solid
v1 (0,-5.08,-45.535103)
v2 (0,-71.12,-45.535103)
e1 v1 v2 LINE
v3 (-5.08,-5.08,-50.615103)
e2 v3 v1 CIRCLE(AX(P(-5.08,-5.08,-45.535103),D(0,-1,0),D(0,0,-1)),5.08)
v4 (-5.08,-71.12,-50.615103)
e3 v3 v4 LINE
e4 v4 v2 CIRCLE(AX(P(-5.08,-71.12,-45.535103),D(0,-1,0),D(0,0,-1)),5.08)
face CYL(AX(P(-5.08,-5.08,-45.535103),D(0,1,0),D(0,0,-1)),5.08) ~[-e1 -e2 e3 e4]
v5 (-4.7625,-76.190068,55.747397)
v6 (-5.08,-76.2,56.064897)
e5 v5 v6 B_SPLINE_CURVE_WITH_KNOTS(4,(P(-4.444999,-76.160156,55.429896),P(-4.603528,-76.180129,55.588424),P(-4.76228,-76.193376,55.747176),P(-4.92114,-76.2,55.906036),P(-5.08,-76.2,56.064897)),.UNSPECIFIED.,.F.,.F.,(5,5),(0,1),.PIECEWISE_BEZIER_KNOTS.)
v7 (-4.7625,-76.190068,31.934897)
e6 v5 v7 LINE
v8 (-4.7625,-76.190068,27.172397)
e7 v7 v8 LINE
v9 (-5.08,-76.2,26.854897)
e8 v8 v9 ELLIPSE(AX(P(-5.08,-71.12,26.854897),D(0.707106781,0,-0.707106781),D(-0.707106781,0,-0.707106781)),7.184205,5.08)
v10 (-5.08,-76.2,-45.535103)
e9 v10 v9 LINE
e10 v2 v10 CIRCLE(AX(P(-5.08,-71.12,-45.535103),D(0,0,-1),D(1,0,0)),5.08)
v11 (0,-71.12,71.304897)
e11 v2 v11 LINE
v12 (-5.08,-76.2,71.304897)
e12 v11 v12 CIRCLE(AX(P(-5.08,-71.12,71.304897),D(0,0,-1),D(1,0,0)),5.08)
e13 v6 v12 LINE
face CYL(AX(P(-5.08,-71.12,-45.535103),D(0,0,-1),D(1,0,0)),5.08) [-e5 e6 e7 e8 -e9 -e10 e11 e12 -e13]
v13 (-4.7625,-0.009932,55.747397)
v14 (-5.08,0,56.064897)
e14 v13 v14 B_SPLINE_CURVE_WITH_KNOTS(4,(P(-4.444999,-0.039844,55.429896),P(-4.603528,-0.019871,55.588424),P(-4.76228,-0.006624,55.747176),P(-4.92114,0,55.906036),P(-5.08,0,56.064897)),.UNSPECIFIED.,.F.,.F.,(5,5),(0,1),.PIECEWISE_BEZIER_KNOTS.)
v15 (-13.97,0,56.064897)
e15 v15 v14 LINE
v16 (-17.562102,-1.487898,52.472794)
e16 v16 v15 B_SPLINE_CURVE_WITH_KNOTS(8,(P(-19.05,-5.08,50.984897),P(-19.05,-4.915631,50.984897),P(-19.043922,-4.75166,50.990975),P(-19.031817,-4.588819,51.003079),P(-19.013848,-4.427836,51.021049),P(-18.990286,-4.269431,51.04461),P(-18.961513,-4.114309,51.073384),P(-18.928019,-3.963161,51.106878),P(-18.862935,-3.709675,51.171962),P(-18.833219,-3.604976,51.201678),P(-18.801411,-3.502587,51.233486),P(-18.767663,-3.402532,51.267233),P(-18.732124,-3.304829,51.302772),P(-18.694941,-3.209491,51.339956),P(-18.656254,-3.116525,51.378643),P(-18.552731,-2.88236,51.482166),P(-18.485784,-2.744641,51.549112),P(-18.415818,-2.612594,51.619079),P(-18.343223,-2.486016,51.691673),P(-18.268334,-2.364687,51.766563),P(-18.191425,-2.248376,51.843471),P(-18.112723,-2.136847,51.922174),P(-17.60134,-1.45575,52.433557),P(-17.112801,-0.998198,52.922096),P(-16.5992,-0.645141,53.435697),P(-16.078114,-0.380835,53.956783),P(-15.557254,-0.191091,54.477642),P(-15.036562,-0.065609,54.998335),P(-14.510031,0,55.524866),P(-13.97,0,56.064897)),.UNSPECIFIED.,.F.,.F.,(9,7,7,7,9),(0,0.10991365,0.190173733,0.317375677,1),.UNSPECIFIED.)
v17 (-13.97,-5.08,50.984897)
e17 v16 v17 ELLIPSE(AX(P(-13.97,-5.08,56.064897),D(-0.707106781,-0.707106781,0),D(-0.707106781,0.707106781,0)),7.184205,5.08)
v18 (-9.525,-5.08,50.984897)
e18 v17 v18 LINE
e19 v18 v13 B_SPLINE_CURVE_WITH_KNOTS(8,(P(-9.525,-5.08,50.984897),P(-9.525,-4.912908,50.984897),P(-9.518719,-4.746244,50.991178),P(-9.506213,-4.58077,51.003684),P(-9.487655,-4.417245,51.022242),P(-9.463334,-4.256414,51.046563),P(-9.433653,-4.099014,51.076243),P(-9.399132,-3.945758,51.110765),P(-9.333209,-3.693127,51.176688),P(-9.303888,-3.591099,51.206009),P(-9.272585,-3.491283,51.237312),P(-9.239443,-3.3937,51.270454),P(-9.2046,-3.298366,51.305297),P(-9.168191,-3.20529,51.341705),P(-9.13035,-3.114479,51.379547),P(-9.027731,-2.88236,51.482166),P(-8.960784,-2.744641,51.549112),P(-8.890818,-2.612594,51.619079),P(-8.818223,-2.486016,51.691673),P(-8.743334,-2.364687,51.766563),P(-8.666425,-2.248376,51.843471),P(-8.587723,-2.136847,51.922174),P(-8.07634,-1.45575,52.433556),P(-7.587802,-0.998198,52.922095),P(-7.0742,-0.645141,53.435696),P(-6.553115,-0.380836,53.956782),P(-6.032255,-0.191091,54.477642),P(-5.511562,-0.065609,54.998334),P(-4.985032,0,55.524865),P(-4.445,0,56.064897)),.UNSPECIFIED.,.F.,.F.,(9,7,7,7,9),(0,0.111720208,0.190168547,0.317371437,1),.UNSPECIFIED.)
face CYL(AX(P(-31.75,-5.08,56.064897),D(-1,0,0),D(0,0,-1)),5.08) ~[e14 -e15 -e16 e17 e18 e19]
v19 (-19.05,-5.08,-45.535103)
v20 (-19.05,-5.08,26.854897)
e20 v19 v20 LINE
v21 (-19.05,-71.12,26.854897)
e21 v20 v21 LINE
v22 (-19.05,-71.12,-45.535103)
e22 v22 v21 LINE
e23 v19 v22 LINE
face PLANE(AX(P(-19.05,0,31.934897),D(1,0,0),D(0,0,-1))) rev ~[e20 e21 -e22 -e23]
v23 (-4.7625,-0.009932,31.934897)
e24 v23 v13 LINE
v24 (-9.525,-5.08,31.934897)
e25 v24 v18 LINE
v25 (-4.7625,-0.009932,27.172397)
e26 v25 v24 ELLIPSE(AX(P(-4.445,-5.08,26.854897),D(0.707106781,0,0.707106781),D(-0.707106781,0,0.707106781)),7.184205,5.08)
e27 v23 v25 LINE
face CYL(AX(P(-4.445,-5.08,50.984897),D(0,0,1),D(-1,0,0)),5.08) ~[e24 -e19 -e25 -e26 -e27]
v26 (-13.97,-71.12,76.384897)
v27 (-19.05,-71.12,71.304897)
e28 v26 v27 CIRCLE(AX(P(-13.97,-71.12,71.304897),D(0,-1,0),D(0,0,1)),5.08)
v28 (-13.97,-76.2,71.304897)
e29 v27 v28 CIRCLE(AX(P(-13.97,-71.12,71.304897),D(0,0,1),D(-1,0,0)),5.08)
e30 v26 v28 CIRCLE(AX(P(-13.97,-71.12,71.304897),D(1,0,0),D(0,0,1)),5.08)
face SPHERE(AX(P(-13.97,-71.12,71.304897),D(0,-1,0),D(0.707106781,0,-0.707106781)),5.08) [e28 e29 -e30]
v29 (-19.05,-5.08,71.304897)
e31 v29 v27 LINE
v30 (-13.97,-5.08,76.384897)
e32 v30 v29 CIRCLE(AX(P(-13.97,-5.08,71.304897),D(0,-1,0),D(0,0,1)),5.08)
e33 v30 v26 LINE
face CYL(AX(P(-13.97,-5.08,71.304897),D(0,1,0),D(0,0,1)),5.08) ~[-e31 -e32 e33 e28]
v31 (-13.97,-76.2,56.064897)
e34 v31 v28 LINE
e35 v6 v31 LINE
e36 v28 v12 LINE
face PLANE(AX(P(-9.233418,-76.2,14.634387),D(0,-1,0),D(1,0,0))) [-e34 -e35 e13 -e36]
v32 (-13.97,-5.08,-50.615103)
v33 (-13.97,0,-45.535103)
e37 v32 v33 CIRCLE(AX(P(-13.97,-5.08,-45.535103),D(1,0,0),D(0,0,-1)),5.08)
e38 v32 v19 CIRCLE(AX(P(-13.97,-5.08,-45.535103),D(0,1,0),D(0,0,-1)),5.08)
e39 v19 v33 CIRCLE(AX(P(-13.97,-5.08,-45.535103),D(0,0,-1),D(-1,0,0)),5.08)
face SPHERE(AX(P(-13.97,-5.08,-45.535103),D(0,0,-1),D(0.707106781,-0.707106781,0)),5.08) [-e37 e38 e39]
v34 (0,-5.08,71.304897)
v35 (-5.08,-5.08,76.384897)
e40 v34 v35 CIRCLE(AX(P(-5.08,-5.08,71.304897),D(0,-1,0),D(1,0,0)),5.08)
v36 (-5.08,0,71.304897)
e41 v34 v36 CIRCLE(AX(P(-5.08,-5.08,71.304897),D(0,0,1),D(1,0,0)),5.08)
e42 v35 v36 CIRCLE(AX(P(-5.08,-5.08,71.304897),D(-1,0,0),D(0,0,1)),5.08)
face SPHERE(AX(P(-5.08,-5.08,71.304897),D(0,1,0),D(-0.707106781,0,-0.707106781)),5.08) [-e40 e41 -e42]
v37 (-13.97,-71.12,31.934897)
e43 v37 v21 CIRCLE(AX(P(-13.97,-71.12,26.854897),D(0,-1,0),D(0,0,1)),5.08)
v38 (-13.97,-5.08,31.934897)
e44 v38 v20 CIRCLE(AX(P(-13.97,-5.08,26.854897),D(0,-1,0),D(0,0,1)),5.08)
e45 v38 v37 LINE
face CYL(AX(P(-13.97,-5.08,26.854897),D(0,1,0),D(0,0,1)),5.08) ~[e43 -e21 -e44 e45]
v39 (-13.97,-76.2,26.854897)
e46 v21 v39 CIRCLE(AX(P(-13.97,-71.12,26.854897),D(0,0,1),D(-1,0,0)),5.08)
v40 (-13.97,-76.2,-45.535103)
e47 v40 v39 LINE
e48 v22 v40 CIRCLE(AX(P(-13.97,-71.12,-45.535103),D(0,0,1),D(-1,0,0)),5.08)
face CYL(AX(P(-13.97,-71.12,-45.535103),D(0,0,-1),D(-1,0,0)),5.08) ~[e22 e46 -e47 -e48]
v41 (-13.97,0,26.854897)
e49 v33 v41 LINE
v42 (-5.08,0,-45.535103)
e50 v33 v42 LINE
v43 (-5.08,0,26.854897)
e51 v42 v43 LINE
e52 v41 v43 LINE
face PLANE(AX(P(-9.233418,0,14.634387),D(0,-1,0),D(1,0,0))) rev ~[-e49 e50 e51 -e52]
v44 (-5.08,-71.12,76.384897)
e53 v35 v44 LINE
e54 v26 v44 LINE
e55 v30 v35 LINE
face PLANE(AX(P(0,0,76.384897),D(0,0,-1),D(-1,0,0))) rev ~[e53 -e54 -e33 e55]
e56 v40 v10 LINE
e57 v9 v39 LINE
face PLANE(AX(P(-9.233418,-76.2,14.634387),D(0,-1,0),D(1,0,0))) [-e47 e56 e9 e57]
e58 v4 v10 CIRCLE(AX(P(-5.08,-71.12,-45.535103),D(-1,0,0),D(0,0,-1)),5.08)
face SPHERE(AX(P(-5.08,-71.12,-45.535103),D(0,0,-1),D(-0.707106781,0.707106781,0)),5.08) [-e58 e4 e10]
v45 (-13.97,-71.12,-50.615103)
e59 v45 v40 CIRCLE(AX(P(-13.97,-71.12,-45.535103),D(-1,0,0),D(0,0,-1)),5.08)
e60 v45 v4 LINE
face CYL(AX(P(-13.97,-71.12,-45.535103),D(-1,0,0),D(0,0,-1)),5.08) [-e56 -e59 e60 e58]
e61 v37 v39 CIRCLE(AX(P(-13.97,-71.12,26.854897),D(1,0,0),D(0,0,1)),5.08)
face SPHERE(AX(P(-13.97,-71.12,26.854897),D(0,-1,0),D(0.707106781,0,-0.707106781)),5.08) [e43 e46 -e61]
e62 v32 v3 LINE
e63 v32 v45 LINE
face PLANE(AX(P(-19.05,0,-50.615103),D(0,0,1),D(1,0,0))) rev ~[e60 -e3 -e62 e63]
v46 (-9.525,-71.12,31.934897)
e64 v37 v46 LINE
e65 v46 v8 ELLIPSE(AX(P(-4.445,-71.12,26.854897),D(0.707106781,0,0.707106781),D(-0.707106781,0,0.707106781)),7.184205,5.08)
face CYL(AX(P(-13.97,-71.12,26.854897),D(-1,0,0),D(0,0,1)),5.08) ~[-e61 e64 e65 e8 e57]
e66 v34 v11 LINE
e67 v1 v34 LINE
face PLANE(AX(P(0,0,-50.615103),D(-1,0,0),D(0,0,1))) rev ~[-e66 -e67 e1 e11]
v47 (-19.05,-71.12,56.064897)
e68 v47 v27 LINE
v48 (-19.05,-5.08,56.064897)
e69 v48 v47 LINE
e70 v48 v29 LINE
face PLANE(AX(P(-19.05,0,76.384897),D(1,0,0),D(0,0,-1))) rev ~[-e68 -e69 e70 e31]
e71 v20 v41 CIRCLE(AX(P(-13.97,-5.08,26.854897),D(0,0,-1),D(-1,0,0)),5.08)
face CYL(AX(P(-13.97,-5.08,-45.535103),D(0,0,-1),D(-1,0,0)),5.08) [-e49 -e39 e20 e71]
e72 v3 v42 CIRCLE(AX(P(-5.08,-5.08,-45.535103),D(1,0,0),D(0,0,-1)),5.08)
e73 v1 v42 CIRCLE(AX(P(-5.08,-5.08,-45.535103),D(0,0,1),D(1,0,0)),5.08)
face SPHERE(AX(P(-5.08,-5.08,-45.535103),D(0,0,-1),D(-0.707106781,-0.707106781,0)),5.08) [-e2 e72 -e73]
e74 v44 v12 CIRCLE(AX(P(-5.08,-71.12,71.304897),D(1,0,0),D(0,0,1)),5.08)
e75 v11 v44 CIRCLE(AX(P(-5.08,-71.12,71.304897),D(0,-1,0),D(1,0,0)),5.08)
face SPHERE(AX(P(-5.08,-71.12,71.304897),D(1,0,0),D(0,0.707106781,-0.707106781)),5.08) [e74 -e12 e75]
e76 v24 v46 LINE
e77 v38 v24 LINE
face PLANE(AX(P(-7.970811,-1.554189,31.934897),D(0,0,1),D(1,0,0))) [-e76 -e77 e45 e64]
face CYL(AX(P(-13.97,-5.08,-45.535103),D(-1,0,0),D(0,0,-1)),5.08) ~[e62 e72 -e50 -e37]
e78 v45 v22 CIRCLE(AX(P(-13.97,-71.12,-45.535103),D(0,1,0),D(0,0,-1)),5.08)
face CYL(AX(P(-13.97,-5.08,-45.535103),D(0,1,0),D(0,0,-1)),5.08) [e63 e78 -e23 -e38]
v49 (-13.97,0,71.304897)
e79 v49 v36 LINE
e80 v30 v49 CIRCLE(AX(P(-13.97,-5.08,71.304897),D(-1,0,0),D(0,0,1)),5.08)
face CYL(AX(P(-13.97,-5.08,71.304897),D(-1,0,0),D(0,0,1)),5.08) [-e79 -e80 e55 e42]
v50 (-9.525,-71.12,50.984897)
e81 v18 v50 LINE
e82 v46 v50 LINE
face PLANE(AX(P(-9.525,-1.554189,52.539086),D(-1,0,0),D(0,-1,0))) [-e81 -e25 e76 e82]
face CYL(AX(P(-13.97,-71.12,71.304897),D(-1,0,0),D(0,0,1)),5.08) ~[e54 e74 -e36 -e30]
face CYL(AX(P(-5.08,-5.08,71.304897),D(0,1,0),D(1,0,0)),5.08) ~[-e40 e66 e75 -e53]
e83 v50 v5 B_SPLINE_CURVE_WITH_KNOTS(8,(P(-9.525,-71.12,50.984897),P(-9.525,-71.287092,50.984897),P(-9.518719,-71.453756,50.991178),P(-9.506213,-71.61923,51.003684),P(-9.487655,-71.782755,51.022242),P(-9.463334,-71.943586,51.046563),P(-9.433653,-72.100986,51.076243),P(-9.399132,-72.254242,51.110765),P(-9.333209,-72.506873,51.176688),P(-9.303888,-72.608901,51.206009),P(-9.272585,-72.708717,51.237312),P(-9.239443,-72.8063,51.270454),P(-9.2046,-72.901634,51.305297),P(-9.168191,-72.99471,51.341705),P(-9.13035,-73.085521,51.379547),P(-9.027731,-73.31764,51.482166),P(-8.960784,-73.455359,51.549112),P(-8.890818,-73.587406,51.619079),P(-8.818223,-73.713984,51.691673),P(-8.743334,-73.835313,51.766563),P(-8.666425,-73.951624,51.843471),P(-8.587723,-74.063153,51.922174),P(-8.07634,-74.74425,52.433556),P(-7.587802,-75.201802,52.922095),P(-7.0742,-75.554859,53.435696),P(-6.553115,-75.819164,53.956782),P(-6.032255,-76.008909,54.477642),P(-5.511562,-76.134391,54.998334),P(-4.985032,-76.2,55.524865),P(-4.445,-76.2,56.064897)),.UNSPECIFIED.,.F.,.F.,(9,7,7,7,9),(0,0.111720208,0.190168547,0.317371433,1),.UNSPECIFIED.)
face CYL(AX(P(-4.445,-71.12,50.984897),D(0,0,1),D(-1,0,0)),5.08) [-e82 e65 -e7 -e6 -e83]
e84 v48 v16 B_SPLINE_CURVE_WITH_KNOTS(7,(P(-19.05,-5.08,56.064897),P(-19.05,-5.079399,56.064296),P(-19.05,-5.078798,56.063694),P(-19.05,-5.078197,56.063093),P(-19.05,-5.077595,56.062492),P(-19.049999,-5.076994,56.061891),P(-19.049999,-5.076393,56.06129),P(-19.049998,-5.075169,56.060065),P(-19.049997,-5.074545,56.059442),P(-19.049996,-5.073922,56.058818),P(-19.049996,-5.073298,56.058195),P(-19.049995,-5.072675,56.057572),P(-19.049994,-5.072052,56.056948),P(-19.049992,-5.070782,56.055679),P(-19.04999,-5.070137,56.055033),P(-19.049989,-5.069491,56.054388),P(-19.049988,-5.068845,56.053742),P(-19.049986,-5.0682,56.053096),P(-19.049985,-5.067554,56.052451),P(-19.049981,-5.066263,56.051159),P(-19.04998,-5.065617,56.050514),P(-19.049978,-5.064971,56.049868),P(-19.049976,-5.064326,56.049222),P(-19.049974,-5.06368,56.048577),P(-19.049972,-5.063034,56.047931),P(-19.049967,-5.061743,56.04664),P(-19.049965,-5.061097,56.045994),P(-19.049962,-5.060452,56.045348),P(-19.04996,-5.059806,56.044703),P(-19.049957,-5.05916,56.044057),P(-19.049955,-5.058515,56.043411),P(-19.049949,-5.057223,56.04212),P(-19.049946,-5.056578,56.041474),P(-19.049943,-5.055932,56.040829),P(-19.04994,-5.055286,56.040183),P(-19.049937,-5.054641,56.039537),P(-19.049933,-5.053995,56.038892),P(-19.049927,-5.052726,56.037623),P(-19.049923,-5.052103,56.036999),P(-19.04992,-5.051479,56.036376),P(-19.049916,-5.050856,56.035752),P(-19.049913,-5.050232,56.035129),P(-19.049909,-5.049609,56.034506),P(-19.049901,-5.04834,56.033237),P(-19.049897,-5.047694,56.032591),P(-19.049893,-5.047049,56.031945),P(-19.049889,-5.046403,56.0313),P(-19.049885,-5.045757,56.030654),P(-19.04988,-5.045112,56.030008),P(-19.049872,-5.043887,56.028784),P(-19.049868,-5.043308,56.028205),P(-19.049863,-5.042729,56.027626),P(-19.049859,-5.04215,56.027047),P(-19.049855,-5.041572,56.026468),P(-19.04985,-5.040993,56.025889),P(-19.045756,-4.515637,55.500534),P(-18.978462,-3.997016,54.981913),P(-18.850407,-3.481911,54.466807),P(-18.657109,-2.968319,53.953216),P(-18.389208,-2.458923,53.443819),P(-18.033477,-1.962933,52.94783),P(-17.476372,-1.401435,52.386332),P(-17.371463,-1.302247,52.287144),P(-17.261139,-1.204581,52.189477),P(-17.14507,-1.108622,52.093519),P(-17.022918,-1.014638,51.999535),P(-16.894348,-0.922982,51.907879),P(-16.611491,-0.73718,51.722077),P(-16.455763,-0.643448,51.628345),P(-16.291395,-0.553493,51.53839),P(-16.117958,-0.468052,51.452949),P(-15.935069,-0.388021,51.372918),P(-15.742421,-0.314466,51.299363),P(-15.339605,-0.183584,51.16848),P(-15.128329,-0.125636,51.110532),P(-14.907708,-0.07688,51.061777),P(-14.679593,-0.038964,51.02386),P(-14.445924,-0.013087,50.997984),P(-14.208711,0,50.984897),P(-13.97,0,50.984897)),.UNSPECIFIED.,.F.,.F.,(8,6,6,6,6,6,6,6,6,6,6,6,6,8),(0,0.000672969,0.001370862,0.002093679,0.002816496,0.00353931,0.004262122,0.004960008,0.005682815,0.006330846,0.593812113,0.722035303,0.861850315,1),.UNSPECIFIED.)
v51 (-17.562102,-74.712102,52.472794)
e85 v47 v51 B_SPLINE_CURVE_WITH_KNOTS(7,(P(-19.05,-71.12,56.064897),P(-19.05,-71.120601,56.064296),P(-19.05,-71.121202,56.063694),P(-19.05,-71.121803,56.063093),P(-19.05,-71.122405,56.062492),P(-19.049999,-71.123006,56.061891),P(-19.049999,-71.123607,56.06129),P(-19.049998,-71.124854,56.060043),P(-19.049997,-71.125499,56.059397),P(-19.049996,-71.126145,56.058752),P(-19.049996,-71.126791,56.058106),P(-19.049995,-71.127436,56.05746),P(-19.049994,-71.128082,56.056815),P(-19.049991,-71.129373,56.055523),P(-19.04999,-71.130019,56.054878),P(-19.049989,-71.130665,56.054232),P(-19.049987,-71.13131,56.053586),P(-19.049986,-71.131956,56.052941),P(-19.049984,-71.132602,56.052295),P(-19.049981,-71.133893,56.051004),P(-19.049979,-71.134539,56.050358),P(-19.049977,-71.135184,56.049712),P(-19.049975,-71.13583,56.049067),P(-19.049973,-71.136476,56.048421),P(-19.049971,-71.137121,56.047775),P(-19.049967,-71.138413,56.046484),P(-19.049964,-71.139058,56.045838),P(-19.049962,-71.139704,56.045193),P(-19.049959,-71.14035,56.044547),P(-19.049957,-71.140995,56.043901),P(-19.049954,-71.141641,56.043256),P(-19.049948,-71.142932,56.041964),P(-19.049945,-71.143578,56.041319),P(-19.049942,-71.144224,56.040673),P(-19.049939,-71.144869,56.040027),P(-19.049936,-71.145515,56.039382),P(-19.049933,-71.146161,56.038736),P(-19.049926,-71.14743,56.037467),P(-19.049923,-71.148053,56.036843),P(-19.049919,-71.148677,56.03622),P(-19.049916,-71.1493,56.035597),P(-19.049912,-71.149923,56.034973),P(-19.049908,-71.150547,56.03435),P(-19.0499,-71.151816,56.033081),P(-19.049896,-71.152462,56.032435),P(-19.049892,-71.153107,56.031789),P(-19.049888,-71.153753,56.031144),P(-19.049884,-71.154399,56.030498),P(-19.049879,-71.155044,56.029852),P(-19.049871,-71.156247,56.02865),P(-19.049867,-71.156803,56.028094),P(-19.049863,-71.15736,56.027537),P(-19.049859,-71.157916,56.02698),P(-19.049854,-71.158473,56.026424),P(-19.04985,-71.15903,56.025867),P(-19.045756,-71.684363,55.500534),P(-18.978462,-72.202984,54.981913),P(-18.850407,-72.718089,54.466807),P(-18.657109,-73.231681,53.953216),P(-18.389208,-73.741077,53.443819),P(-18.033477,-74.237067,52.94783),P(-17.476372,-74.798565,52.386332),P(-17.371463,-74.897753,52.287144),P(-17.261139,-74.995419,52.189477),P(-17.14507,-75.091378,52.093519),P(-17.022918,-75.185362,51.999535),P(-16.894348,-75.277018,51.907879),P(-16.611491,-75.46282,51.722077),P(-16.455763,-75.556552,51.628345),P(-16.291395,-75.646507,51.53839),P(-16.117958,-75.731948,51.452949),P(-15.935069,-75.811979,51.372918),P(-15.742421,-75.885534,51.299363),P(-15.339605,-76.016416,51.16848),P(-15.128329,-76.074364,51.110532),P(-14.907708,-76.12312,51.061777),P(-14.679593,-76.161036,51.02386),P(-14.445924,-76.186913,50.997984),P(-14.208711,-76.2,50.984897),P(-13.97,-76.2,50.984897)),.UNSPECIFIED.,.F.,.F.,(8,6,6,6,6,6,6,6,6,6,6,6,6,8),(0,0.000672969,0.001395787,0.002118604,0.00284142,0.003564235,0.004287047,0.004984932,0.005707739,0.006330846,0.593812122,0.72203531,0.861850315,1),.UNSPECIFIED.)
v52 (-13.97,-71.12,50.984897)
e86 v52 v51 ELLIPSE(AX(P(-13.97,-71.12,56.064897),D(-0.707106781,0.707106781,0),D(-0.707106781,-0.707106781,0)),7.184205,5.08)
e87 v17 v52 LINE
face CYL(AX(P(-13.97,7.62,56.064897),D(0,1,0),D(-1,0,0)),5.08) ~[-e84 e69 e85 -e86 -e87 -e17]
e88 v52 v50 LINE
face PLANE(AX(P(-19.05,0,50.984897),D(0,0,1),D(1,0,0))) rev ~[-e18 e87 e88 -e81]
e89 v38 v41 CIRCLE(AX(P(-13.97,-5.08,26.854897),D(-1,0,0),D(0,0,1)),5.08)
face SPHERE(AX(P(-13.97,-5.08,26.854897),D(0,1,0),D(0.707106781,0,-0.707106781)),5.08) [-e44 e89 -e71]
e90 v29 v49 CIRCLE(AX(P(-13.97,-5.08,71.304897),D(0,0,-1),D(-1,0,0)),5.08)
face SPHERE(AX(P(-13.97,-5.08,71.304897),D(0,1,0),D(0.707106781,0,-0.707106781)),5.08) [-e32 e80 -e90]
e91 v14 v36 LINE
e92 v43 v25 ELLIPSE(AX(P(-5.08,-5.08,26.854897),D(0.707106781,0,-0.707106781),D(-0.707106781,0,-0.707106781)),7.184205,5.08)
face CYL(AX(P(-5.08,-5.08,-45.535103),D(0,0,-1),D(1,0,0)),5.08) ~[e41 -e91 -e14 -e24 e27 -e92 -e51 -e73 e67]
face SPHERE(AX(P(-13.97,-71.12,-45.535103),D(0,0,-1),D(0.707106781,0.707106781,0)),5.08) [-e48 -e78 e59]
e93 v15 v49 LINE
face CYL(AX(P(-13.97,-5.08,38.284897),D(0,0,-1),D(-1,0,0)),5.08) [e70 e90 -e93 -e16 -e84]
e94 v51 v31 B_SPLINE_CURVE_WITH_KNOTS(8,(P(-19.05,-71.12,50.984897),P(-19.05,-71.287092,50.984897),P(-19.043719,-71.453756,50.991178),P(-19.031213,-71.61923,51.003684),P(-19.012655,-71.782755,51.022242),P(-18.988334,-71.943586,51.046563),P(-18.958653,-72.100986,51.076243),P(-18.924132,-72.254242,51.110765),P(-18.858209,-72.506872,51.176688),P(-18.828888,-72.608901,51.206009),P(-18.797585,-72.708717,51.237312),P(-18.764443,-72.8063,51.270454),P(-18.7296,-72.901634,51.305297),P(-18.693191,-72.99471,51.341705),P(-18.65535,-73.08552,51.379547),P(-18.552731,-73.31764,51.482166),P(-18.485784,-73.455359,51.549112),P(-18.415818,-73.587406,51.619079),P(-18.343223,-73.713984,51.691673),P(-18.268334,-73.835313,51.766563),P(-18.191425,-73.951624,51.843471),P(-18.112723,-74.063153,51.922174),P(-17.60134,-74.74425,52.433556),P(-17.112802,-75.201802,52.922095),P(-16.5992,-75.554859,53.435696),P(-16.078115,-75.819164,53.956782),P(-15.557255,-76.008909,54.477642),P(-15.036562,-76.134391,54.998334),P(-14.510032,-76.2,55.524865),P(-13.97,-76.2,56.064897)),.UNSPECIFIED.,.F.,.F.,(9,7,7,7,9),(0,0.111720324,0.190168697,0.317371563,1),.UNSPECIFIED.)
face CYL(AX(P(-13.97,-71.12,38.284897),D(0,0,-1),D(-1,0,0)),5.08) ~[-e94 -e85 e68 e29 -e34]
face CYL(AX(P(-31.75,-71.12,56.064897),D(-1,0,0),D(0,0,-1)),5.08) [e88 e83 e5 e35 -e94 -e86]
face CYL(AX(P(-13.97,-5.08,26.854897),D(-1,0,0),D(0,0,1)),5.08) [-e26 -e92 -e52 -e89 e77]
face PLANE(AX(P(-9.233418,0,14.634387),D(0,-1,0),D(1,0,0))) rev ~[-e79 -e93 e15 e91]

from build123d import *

# Parameters (mm, degrees)
F1_DEPTH      = 76.2
F2_T1_DEPTH   = 8.89
F2_T3_DEPTH   = 116.84
F2_T5_DEPTH   = 33.02
F2_T7_DEPTH   = 22.225
F2_T9_DEPTH   = 19.05
F2_T11_DEPTH  = 4.445
F2_T13_DEPTH  = 72.39
F2_T15_DEPTH  = 66.04
F2_S19_W      = 5.08
F2_S19_H      = 5.08
F2_T20_DEPTH  = 5.08
F2_S25_W      = 5.08
F2_S25_H      = 5.08
F2_T26_DEPTH  = 5.08
F2_S31_W      = 5.08
F2_S31_H      = 5.08
F2_T32_DEPTH  = 5.08
F2_S37_W      = 5.08
F2_S37_H      = 5.08
F2_T38_DEPTH  = 5.08
F2_S43_W      = 5.08
F2_S43_H      = 5.08
F2_T44_DEPTH  = 5.08
F2_S49_W      = 5.08
F2_S49_H      = 5.08
F2_T50_DEPTH  = 5.08
F2_S55_W      = 5.08
F2_S55_H      = 5.08
F2_T56_DEPTH  = 5.08
F2_S61_W      = 5.08
F2_S61_H      = 5.08
F2_T62_DEPTH  = 5.08
F2_S67_W      = 5.08
F2_S67_H      = 5.08
F2_T68_DEPTH  = 5.08
F2_S73_W      = 5.08
F2_S73_H      = 5.08
F2_T74_DEPTH  = 5.08
F2_T81_DEPTH  = 34.925
F2_T85_DEPTH  = 31.75
F2_T92_DEPTH  = 31.75
F2_T96_DEPTH  = 17.145
F2_T103_DEPTH = 34.925
F2_T107_DEPTH = 31.75
F2_T114_DEPTH = 31.75
F2_T118_DEPTH = 17.145
F3_T1_DEPTH   = 91.44


# Not quite as in the source:
# - a fillet or chamfer that OpenCascade refuses, or shapes differently, is made with other operations: its cross-section is extruded or revolved along the edge and cut away or added


with BuildPart() as f1:
    # F0 (on Front) → F1 (new body)
    with BuildSketch(Plane.XZ):
        Polygon((-19.05, -50.6151032805), (0, -50.6151032805), (0, 76.3848967195), (-19.05, 76.3848967195), (-19.05, 50.9848967195), (-9.525, 50.9848967195), (-9.525, 31.9348967195), (-19.05, 31.9348967195), align=None)
    extrude(amount=F1_DEPTH)

    # F2: fillet of radius 5.08 on 21 edges, made by hand

    # F2_s2 → F2_t1 (cut)
    with BuildSketch(Plane.YZ.offset(-13.97)):
        with BuildLine():
            ThreePointArc((-71.12, -50.6151032805), (-74.7121024484, -49.127205729), (-76.2, -45.5351032805))
            Line((-76.2, -45.5351032805), (-76.2, -50.6151032805))
            Line((-76.2, -50.6151032805), (-71.12, -50.6151032805))
        make_face()
        with BuildLine():
            ThreePointArc((-71.12, 76.3848967195), (-74.7121024484, 74.8969991679), (-76.2, 71.3048967195))
            Line((-76.2, 71.3048967195), (-76.2, 76.3848967195))
            Line((-76.2, 76.3848967195), (-71.12, 76.3848967195))
        make_face()
        with BuildLine():
            ThreePointArc((-5.08, 76.3848967195), (-1.4878975516, 74.8969991679), (0, 71.3048967195))
            Line((0, 71.3048967195), (0, 76.3848967195))
            Line((0, 76.3848967195), (-5.08, 76.3848967195))
        make_face()
        with BuildLine():
            ThreePointArc((-5.08, -50.6151032805), (-1.4878975516, -49.127205729), (0, -45.5351032805))
            Line((0, -45.5351032805), (0, -50.6151032805))
            Line((0, -50.6151032805), (-5.08, -50.6151032805))
        make_face()
    extrude(amount=F2_T1_DEPTH, mode=Mode.SUBTRACT)

    # F2_s4 → F2_t3 (cut)
    with BuildSketch(Plane.XY.offset(-45.5351032805)):
        with BuildLine():
            ThreePointArc((0, -71.12), (-1.4878975516, -74.7121024484), (-5.08, -76.2))
            Line((-5.08, -76.2), (0, -76.2))
            Line((0, -76.2), (0, -71.12))
        make_face()
        with BuildLine():
            ThreePointArc((0, -5.08), (-1.4878975516, -1.4878975516), (-5.08, 0))
            Line((-5.08, 0), (0, 0))
            Line((0, 0), (0, -5.08))
        make_face()
    extrude(amount=F2_T3_DEPTH, mode=Mode.SUBTRACT)

    # F2_s6 → F2_t5 (cut)
    with BuildSketch(Plane.XY.offset(38.2848967195)):
        with BuildLine():
            ThreePointArc((-19.05, -71.12), (-17.5621024484, -74.7121024484), (-13.97, -76.2))
            Line((-13.97, -76.2), (-19.05, -76.2))
            Line((-19.05, -76.2), (-19.05, -71.12))
        make_face()
        with BuildLine():
            ThreePointArc((-19.05, -5.08), (-17.5621024484, -1.4878975516), (-13.97, 0))
            Line((-13.97, 0), (-19.05, 0))
            Line((-19.05, 0), (-19.05, -5.08))
        make_face()
    extrude(amount=F2_T5_DEPTH, mode=Mode.SUBTRACT)

    # F2_s8 → F2_t7 (cut)
    with BuildSketch(Plane.YZ.offset(-31.75)):
        with BuildLine():
            ThreePointArc((-71.12, 50.9848967195), (-74.7121024484, 52.472794271), (-76.2, 56.0648967195))
            Line((-76.2, 56.0648967195), (-76.2, 50.9848967195))
            Line((-76.2, 50.9848967195), (-71.12, 50.9848967195))
        make_face()
        with BuildLine():
            ThreePointArc((-5.08, 50.9848967195), (-1.4878975516, 52.472794271), (0, 56.0648967195))
            Line((0, 56.0648967195), (0, 50.9848967195))
            Line((0, 50.9848967195), (-5.08, 50.9848967195))
        make_face()
    extrude(amount=F2_T7_DEPTH, mode=Mode.SUBTRACT)

    # F2_s10 → F2_t9 (cut)
    with BuildSketch(Plane.XY.offset(31.9348967195)):
        with BuildLine():
            ThreePointArc((-9.525, -71.12), (-8.0371024484, -74.7121024484), (-4.445, -76.2))
            Line((-4.445, -76.2), (-9.525, -76.2))
            Line((-9.525, -76.2), (-9.525, -71.12))
        make_face()
        with BuildLine():
            ThreePointArc((-9.525, -5.08), (-8.0371024484, -1.4878975516), (-4.445, 0))
            Line((-4.445, 0), (-9.525, 0))
            Line((-9.525, 0), (-9.525, -5.08))
        make_face()
    extrude(amount=F2_T9_DEPTH, mode=Mode.SUBTRACT)

    # F2_s12 → F2_t11 (cut)
    with BuildSketch(Plane.YZ.offset(-13.97)):
        with BuildLine():
            ThreePointArc((-71.12, 31.9348967195), (-74.7121024484, 30.4469991679), (-76.2, 26.8548967195))
            Line((-76.2, 26.8548967195), (-76.2, 31.9348967195))
            Line((-76.2, 31.9348967195), (-71.12, 31.9348967195))
        make_face()
        with BuildLine():
            ThreePointArc((-5.08, 31.9348967195), (-1.4878975516, 30.4469991679), (0, 26.8548967195))
            Line((0, 26.8548967195), (0, 31.9348967195))
            Line((0, 31.9348967195), (-5.08, 31.9348967195))
        make_face()
    extrude(amount=F2_T11_DEPTH, mode=Mode.SUBTRACT)

    # F2_s14 → F2_t13 (cut)
    with BuildSketch(Plane.XY.offset(-45.5351032805)):
        with BuildLine():
            ThreePointArc((-19.05, -71.12), (-17.5621024484, -74.7121024484), (-13.97, -76.2))
            Line((-13.97, -76.2), (-19.05, -76.2))
            Line((-19.05, -76.2), (-19.05, -71.12))
        make_face()
        with BuildLine():
            ThreePointArc((-19.05, -5.08), (-17.5621024484, -1.4878975516), (-13.97, 0))
            Line((-13.97, 0), (-19.05, 0))
            Line((-19.05, 0), (-19.05, -5.08))
        make_face()
    extrude(amount=F2_T13_DEPTH, mode=Mode.SUBTRACT)

    # F2_s16 → F2_t15 (cut)
    with BuildSketch(Plane.XZ.offset(5.08)):
        with BuildLine():
            ThreePointArc((0, 71.3048967195), (-1.4878975516, 74.8969991679), (-5.08, 76.3848967195))
            Line((-5.08, 76.3848967195), (0, 76.3848967195))
            Line((0, 76.3848967195), (0, 71.3048967195))
        make_face()
        with BuildLine():
            ThreePointArc((-13.97, 76.3848967195), (-17.5621024484, 74.8969991679), (-19.05, 71.3048967195))
            Line((-19.05, 71.3048967195), (-19.05, 76.3848967195))
            Line((-19.05, 76.3848967195), (-13.97, 76.3848967195))
        make_face()
        with BuildLine():
            ThreePointArc((-13.97, 31.9348967195), (-17.5621024484, 30.4469991679), (-19.05, 26.8548967195))
            Line((-19.05, 26.8548967195), (-19.05, 31.9348967195))
            Line((-19.05, 31.9348967195), (-13.97, 31.9348967195))
        make_face()
        with BuildLine():
            ThreePointArc((-13.97, -50.6151032805), (-17.5621024484, -49.127205729), (-19.05, -45.5351032805))
            Line((-19.05, -45.5351032805), (-19.05, -50.6151032805))
            Line((-19.05, -50.6151032805), (-13.97, -50.6151032805))
        make_face()
        with BuildLine():
            ThreePointArc((-5.08, -50.6151032805), (-1.4878975516, -49.127205729), (0, -45.5351032805))
            Line((0, -45.5351032805), (0, -50.6151032805))
            Line((0, -50.6151032805), (-5.08, -50.6151032805))
        make_face()
    extrude(amount=F2_T15_DEPTH, mode=Mode.SUBTRACT)


with BuildPart() as f2_tool18:
    # F2_s19 → F2_t20 (new body)
    with BuildSketch(Plane.XY.offset(-45.5351032805)):
        with Locations((-16.51, -73.66)):
            Rectangle(F2_S19_W, F2_S19_H)
    extrude(amount=-F2_T20_DEPTH)

    # F2_s21 → F2_t22 (revolve, cut)
    with BuildSketch(Plane(origin=(-13.97, -71.12, -45.5351032805), x_dir=(0.7071067812, 0.7071067812, 0), z_dir=(-0.7071067812, 0.7071067812, 0))):
        with BuildLine():
            ThreePointArc((0, -5.08), (5.08, 0), (0, 5.08))
            Line((0, 5.08), (0, -5.08))
        make_face()
    revolve(axis=Axis((-13.97, -71.12, -45.5351032805), (0, 0, -1)), mode=Mode.SUBTRACT)


with BuildPart() as f1_1:
    add(f1.part)

    # F2_t17: cut F2_tool18
    add(f2_tool18.part, mode=Mode.SUBTRACT)


with BuildPart() as f2_tool24:
    # F2_s25 → F2_t26 (new body)
    with BuildSketch(Plane.XY.offset(-45.5351032805)):
        with Locations((-2.54, -73.66)):
            Rectangle(F2_S25_W, F2_S25_H)
    extrude(amount=-F2_T26_DEPTH)

    # F2_s27 → F2_t28 (revolve, cut)
    with BuildSketch(Plane(origin=(-5.08, -71.12, -45.5351032805), x_dir=(-0.7071067812, 0.7071067812, 0), z_dir=(-0.7071067812, -0.7071067812, 0))):
        with BuildLine():
            ThreePointArc((0, -5.08), (5.08, 0), (0, 5.08))
            Line((0, 5.08), (0, -5.08))
        make_face()
    revolve(axis=Axis((-5.08, -71.12, -45.5351032805), (0, 0, -1)), mode=Mode.SUBTRACT)


with BuildPart() as f1_2:
    add(f1_1.part)

    # F2_t23: cut F2_tool24
    add(f2_tool24.part, mode=Mode.SUBTRACT)


with BuildPart() as f2_tool30:
    # F2_s31 → F2_t32 (new body)
    with BuildSketch(Plane.YZ.offset(-5.08)):
        with Locations((-73.66, 73.8448967195)):
            Rectangle(F2_S31_W, F2_S31_H)
    extrude(amount=F2_T32_DEPTH)

    # F2_s33 → F2_t34 (revolve, cut)
    with BuildSketch(Plane(origin=(-5.08, -71.12, 71.3048967195), x_dir=(0, 0.7071067812, -0.7071067812), z_dir=(0, -0.7071067812, -0.7071067812))):
        with BuildLine():
            ThreePointArc((0, -5.08), (5.08, 0), (0, 5.08))
            Line((0, 5.08), (0, -5.08))
        make_face()
    revolve(axis=Axis((-5.08, -71.12, 71.3048967195), (1, 0, 0)), mode=Mode.SUBTRACT)


with BuildPart() as f1_3:
    add(f1_2.part)

    # F2_t29: cut F2_tool30
    add(f2_tool30.part, mode=Mode.SUBTRACT)


with BuildPart() as f2_tool36:
    # F2_s37 → F2_t38 (new body)
    with BuildSketch(Plane.XZ.offset(71.12)):
        with Locations((-16.51, 73.8448967195)):
            Rectangle(F2_S37_W, F2_S37_H)
    extrude(amount=F2_T38_DEPTH)

    # F2_s39 → F2_t40 (revolve, cut)
    with BuildSketch(Plane(origin=(-13.97, -71.12, 71.3048967195), x_dir=(0.7071067812, 0, -0.7071067812), z_dir=(-0.7071067812, 0, -0.7071067812))):
        with BuildLine():
            ThreePointArc((0, -5.08), (5.08, 0), (0, 5.08))
            Line((0, 5.08), (0, -5.08))
        make_face()
    revolve(axis=Axis((-13.97, -71.12, 71.3048967195), (0, -1, 0)), mode=Mode.SUBTRACT)


with BuildPart() as f1_4:
    add(f1_3.part)

    # F2_t35: cut F2_tool36
    add(f2_tool36.part, mode=Mode.SUBTRACT)


with BuildPart() as f2_tool42:
    # F2_s43 → F2_t44 (new body)
    with BuildSketch(Plane.XZ.offset(71.12)):
        with Locations((-16.51, 29.3948967195)):
            Rectangle(F2_S43_W, F2_S43_H)
    extrude(amount=F2_T44_DEPTH)

    # F2_s45 → F2_t46 (revolve, cut)
    with BuildSketch(Plane(origin=(-13.97, -71.12, 26.8548967195), x_dir=(0.7071067812, 0, -0.7071067812), z_dir=(-0.7071067812, 0, -0.7071067812))):
        with BuildLine():
            ThreePointArc((0, -5.08), (5.08, 0), (0, 5.08))
            Line((0, 5.08), (0, -5.08))
        make_face()
    revolve(axis=Axis((-13.97, -71.12, 26.8548967195), (0, -1, 0)), mode=Mode.SUBTRACT)


with BuildPart() as f1_5:
    add(f1_4.part)

    # F2_t41: cut F2_tool42
    add(f2_tool42.part, mode=Mode.SUBTRACT)


with BuildPart() as f2_tool48:
    # F2_s49 → F2_t50 (new body)
    with BuildSketch(Plane.XZ.offset(5.08)):
        with Locations((-2.54, 73.8448967195)):
            Rectangle(F2_S49_W, F2_S49_H)
    extrude(amount=-F2_T50_DEPTH)

    # F2_s51 → F2_t52 (revolve, cut)
    with BuildSketch(Plane(origin=(-5.08, -5.08, 71.3048967195), x_dir=(-0.7071067812, 0, -0.7071067812), z_dir=(0.7071067812, 0, -0.7071067812))):
        with BuildLine():
            ThreePointArc((0, -5.08), (5.08, 0), (0, 5.08))
            Line((0, 5.08), (0, -5.08))
        make_face()
    revolve(axis=Axis((-5.08, -5.08, 71.3048967195), (0, 1, 0)), mode=Mode.SUBTRACT)


with BuildPart() as f1_6:
    add(f1_5.part)

    # F2_t47: cut F2_tool48
    add(f2_tool48.part, mode=Mode.SUBTRACT)


with BuildPart() as f2_tool54:
    # F2_s55 → F2_t56 (new body)
    with BuildSketch(Plane.XZ.offset(5.08)):
        with Locations((-16.51, 73.8448967195)):
            Rectangle(F2_S55_W, F2_S55_H)
    extrude(amount=-F2_T56_DEPTH)

    # F2_s57 → F2_t58 (revolve, cut)
    with BuildSketch(Plane(origin=(-13.97, -5.08, 71.3048967195), x_dir=(0.7071067812, 0, -0.7071067812), z_dir=(0.7071067812, 0, 0.7071067812))):
        with BuildLine():
            ThreePointArc((0, -5.08), (5.08, 0), (0, 5.08))
            Line((0, 5.08), (0, -5.08))
        make_face()
    revolve(axis=Axis((-13.97, -5.08, 71.3048967195), (0, 1, 0)), mode=Mode.SUBTRACT)


with BuildPart() as f1_7:
    add(f1_6.part)

    # F2_t53: cut F2_tool54
    add(f2_tool54.part, mode=Mode.SUBTRACT)


with BuildPart() as f2_tool60:
    # F2_s61 → F2_t62 (new body)
    with BuildSketch(Plane.XZ.offset(5.08)):
        with Locations((-16.51, 29.3948967195)):
            Rectangle(F2_S61_W, F2_S61_H)
    extrude(amount=-F2_T62_DEPTH)

    # F2_s63 → F2_t64 (revolve, cut)
    with BuildSketch(Plane(origin=(-13.97, -5.08, 26.8548967195), x_dir=(0.7071067812, 0, -0.7071067812), z_dir=(0.7071067812, 0, 0.7071067812))):
        with BuildLine():
            ThreePointArc((0, -5.08), (5.08, 0), (0, 5.08))
            Line((0, 5.08), (0, -5.08))
        make_face()
    revolve(axis=Axis((-13.97, -5.08, 26.8548967195), (0, 1, 0)), mode=Mode.SUBTRACT)


with BuildPart() as f1_8:
    add(f1_7.part)

    # F2_t59: cut F2_tool60
    add(f2_tool60.part, mode=Mode.SUBTRACT)


with BuildPart() as f2_tool66:
    # F2_s67 → F2_t68 (new body)
    with BuildSketch(Plane.XY.offset(-45.5351032805)):
        with Locations((-16.51, -2.54)):
            Rectangle(F2_S67_W, F2_S67_H)
    extrude(amount=-F2_T68_DEPTH)

    # F2_s69 → F2_t70 (revolve, cut)
    with BuildSketch(Plane(origin=(-13.97, -5.08, -45.5351032805), x_dir=(0.7071067812, -0.7071067812, 0), z_dir=(0.7071067812, 0.7071067812, 0))):
        with BuildLine():
            ThreePointArc((0, -5.08), (5.08, 0), (0, 5.08))
            Line((0, 5.08), (0, -5.08))
        make_face()
    revolve(axis=Axis((-13.97, -5.08, -45.5351032805), (0, 0, -1)), mode=Mode.SUBTRACT)


with BuildPart() as f1_9:
    add(f1_8.part)

    # F2_t65: cut F2_tool66
    add(f2_tool66.part, mode=Mode.SUBTRACT)


with BuildPart() as f2_tool72:
    # F2_s73 → F2_t74 (new body)
    with BuildSketch(Plane.XY.offset(-45.5351032805)):
        with Locations((-2.54, -2.54)):
            Rectangle(F2_S73_W, F2_S73_H)
    extrude(amount=-F2_T74_DEPTH)

    # F2_s75 → F2_t76 (revolve, cut)
    with BuildSketch(Plane(origin=(-5.08, -5.08, -45.5351032805), x_dir=(-0.7071067812, -0.7071067812, 0), z_dir=(0.7071067812, -0.7071067812, 0))):
        with BuildLine():
            ThreePointArc((0, -5.08), (5.08, 0), (0, 5.08))
            Line((0, 5.08), (0, -5.08))
        make_face()
    revolve(axis=Axis((-5.08, -5.08, -45.5351032805), (0, 0, -1)), mode=Mode.SUBTRACT)


with BuildPart() as f1_10:
    add(f1_9.part)

    # F2_t71: cut F2_tool72
    add(f2_tool72.part, mode=Mode.SUBTRACT)


with BuildPart() as f2_tool79:
    # F2_s80 → F2_t81 (new body)
    with BuildSketch(Plane.YZ.offset(-31.75)):
        with BuildLine():
            ThreePointArc((-71.12, 50.9848967195), (-74.7121024484, 52.472794271), (-76.2, 56.0648967195))
            Line((-76.2, 56.0648967195), (-76.2, 50.9848967195))
            Line((-76.2, 50.9848967195), (-71.12, 50.9848967195))
        make_face()
    extrude(amount=F2_T81_DEPTH)

    split(bisect_by=Plane.YZ.offset(-9.525), keep=Keep.TOP)


with BuildPart() as f2_tool83:
    # F2_s84 → F2_t85 (new body)
    with BuildSketch(Plane.XY.offset(63.6848967195)):
        with BuildLine():
            ThreePointArc((-9.525, -71.12), (-8.0371024484, -74.7121024484), (-4.445, -76.2))
            Line((-4.445, -76.2), (-9.525, -76.2))
            Line((-9.525, -76.2), (-9.525, -71.12))
        make_face()
    extrude(amount=-F2_T85_DEPTH)

    split(bisect_by=Plane.XY.offset(50.9848967195), keep=Keep.TOP)


with BuildPart() as f2_tool79_1:
    add(f2_tool79.part)

    # F2_t87: intersect F2_tool83
    add(f2_tool83.part, mode=Mode.INTERSECT)


with BuildPart() as f1_11:
    add(f1_10.part)

    # F2_t77: cut F2_tool79
    add(f2_tool79_1.part, mode=Mode.SUBTRACT)


with BuildPart() as f2_tool90:
    # F2_s91 → F2_t92 (new body)
    with BuildSketch(Plane.XY.offset(50.9848967195)):
        with BuildLine():
            ThreePointArc((-9.525, -71.12), (-8.0371024484, -74.7121024484), (-4.445, -76.2))
            Line((-4.445, -76.2), (-9.525, -76.2))
            Line((-9.525, -76.2), (-9.525, -71.12))
        make_face()
    extrude(amount=-F2_T92_DEPTH)

    split(bisect_by=Plane.XY.offset(31.9348967195), keep=Keep.BOTTOM)


with BuildPart() as f2_tool94:
    # F2_s95 → F2_t96 (new body)
    with BuildSketch(Plane.YZ.offset(3.175)):
        with BuildLine():
            ThreePointArc((-71.12, 31.9348967195), (-74.7121024484, 30.4469991679), (-76.2, 26.8548967195))
            Line((-76.2, 26.8548967195), (-76.2, 31.9348967195))
            Line((-76.2, 31.9348967195), (-71.12, 31.9348967195))
        make_face()
    extrude(amount=-F2_T96_DEPTH)

    split(bisect_by=Plane.YZ.offset(-9.525), keep=Keep.TOP)


with BuildPart() as f2_tool90_1:
    add(f2_tool90.part)

    # F2_t98: intersect F2_tool94
    add(f2_tool94.part, mode=Mode.INTERSECT)


with BuildPart() as f1_12:
    add(f1_11.part)

    # F2_t88: cut F2_tool90
    add(f2_tool90_1.part, mode=Mode.SUBTRACT)


with BuildPart() as f2_tool101:
    # F2_s102 → F2_t103 (new body)
    with BuildSketch(Plane.YZ.offset(-31.75)):
        with BuildLine():
            ThreePointArc((-5.08, 50.9848967195), (-1.4878975516, 52.472794271), (0, 56.0648967195))
            Line((0, 56.0648967195), (0, 50.9848967195))
            Line((0, 50.9848967195), (-5.08, 50.9848967195))
        make_face()
    extrude(amount=F2_T103_DEPTH)

    split(bisect_by=Plane.YZ.offset(-9.525), keep=Keep.TOP)


with BuildPart() as f2_tool105:
    # F2_s106 → F2_t107 (new body)
    with BuildSketch(Plane.XY.offset(63.6848967195)):
        with BuildLine():
            ThreePointArc((-9.525, -5.08), (-8.0371024484, -1.4878975516), (-4.445, 0))
            Line((-4.445, 0), (-9.525, 0))
            Line((-9.525, 0), (-9.525, -5.08))
        make_face()
    extrude(amount=-F2_T107_DEPTH)

    split(bisect_by=Plane.XY.offset(50.9848967195), keep=Keep.TOP)


with BuildPart() as f2_tool101_1:
    add(f2_tool101.part)

    # F2_t109: intersect F2_tool105
    add(f2_tool105.part, mode=Mode.INTERSECT)


with BuildPart() as f1_13:
    add(f1_12.part)

    # F2_t99: cut F2_tool101
    add(f2_tool101_1.part, mode=Mode.SUBTRACT)


with BuildPart() as f2_tool112:
    # F2_s113 → F2_t114 (new body)
    with BuildSketch(Plane.XY.offset(50.9848967195)):
        with BuildLine():
            ThreePointArc((-9.525, -5.08), (-8.0371024484, -1.4878975516), (-4.445, 0))
            Line((-4.445, 0), (-9.525, 0))
            Line((-9.525, 0), (-9.525, -5.08))
        make_face()
    extrude(amount=-F2_T114_DEPTH)

    split(bisect_by=Plane.XY.offset(31.9348967195), keep=Keep.BOTTOM)


with BuildPart() as f2_tool116:
    # F2_s117 → F2_t118 (new body)
    with BuildSketch(Plane.YZ.offset(3.175)):
        with BuildLine():
            ThreePointArc((-5.08, 31.9348967195), (-1.4878975516, 30.4469991679), (0, 26.8548967195))
            Line((0, 26.8548967195), (0, 31.9348967195))
            Line((0, 31.9348967195), (-5.08, 31.9348967195))
        make_face()
    extrude(amount=-F2_T118_DEPTH)

    split(bisect_by=Plane.YZ.offset(-9.525), keep=Keep.TOP)


with BuildPart() as f2_tool112_1:
    add(f2_tool112.part)

    # F2_t120: intersect F2_tool116
    add(f2_tool116.part, mode=Mode.INTERSECT)


with BuildPart() as f1_14:
    add(f1_13.part)

    # F2_t110: cut F2_tool112
    add(f2_tool112_1.part, mode=Mode.SUBTRACT)

    # F3: fillet of radius 5.08 on 4 edges, made by hand

    # F3_s2 → F3_t1 (cut)
    with BuildSketch(Plane.XZ.offset(-7.62)):
        with BuildLine():
            ThreePointArc((-19.05, 56.0648967195), (-17.5621024484, 52.472794271), (-13.97, 50.9848967195))
            Line((-13.97, 50.9848967195), (-19.05, 50.9848967195))
            Line((-19.05, 50.9848967195), (-19.05, 56.0648967195))
        make_face()
    extrude(amount=F3_T1_DEPTH, mode=Mode.SUBTRACT)


solid = f1_14.part
